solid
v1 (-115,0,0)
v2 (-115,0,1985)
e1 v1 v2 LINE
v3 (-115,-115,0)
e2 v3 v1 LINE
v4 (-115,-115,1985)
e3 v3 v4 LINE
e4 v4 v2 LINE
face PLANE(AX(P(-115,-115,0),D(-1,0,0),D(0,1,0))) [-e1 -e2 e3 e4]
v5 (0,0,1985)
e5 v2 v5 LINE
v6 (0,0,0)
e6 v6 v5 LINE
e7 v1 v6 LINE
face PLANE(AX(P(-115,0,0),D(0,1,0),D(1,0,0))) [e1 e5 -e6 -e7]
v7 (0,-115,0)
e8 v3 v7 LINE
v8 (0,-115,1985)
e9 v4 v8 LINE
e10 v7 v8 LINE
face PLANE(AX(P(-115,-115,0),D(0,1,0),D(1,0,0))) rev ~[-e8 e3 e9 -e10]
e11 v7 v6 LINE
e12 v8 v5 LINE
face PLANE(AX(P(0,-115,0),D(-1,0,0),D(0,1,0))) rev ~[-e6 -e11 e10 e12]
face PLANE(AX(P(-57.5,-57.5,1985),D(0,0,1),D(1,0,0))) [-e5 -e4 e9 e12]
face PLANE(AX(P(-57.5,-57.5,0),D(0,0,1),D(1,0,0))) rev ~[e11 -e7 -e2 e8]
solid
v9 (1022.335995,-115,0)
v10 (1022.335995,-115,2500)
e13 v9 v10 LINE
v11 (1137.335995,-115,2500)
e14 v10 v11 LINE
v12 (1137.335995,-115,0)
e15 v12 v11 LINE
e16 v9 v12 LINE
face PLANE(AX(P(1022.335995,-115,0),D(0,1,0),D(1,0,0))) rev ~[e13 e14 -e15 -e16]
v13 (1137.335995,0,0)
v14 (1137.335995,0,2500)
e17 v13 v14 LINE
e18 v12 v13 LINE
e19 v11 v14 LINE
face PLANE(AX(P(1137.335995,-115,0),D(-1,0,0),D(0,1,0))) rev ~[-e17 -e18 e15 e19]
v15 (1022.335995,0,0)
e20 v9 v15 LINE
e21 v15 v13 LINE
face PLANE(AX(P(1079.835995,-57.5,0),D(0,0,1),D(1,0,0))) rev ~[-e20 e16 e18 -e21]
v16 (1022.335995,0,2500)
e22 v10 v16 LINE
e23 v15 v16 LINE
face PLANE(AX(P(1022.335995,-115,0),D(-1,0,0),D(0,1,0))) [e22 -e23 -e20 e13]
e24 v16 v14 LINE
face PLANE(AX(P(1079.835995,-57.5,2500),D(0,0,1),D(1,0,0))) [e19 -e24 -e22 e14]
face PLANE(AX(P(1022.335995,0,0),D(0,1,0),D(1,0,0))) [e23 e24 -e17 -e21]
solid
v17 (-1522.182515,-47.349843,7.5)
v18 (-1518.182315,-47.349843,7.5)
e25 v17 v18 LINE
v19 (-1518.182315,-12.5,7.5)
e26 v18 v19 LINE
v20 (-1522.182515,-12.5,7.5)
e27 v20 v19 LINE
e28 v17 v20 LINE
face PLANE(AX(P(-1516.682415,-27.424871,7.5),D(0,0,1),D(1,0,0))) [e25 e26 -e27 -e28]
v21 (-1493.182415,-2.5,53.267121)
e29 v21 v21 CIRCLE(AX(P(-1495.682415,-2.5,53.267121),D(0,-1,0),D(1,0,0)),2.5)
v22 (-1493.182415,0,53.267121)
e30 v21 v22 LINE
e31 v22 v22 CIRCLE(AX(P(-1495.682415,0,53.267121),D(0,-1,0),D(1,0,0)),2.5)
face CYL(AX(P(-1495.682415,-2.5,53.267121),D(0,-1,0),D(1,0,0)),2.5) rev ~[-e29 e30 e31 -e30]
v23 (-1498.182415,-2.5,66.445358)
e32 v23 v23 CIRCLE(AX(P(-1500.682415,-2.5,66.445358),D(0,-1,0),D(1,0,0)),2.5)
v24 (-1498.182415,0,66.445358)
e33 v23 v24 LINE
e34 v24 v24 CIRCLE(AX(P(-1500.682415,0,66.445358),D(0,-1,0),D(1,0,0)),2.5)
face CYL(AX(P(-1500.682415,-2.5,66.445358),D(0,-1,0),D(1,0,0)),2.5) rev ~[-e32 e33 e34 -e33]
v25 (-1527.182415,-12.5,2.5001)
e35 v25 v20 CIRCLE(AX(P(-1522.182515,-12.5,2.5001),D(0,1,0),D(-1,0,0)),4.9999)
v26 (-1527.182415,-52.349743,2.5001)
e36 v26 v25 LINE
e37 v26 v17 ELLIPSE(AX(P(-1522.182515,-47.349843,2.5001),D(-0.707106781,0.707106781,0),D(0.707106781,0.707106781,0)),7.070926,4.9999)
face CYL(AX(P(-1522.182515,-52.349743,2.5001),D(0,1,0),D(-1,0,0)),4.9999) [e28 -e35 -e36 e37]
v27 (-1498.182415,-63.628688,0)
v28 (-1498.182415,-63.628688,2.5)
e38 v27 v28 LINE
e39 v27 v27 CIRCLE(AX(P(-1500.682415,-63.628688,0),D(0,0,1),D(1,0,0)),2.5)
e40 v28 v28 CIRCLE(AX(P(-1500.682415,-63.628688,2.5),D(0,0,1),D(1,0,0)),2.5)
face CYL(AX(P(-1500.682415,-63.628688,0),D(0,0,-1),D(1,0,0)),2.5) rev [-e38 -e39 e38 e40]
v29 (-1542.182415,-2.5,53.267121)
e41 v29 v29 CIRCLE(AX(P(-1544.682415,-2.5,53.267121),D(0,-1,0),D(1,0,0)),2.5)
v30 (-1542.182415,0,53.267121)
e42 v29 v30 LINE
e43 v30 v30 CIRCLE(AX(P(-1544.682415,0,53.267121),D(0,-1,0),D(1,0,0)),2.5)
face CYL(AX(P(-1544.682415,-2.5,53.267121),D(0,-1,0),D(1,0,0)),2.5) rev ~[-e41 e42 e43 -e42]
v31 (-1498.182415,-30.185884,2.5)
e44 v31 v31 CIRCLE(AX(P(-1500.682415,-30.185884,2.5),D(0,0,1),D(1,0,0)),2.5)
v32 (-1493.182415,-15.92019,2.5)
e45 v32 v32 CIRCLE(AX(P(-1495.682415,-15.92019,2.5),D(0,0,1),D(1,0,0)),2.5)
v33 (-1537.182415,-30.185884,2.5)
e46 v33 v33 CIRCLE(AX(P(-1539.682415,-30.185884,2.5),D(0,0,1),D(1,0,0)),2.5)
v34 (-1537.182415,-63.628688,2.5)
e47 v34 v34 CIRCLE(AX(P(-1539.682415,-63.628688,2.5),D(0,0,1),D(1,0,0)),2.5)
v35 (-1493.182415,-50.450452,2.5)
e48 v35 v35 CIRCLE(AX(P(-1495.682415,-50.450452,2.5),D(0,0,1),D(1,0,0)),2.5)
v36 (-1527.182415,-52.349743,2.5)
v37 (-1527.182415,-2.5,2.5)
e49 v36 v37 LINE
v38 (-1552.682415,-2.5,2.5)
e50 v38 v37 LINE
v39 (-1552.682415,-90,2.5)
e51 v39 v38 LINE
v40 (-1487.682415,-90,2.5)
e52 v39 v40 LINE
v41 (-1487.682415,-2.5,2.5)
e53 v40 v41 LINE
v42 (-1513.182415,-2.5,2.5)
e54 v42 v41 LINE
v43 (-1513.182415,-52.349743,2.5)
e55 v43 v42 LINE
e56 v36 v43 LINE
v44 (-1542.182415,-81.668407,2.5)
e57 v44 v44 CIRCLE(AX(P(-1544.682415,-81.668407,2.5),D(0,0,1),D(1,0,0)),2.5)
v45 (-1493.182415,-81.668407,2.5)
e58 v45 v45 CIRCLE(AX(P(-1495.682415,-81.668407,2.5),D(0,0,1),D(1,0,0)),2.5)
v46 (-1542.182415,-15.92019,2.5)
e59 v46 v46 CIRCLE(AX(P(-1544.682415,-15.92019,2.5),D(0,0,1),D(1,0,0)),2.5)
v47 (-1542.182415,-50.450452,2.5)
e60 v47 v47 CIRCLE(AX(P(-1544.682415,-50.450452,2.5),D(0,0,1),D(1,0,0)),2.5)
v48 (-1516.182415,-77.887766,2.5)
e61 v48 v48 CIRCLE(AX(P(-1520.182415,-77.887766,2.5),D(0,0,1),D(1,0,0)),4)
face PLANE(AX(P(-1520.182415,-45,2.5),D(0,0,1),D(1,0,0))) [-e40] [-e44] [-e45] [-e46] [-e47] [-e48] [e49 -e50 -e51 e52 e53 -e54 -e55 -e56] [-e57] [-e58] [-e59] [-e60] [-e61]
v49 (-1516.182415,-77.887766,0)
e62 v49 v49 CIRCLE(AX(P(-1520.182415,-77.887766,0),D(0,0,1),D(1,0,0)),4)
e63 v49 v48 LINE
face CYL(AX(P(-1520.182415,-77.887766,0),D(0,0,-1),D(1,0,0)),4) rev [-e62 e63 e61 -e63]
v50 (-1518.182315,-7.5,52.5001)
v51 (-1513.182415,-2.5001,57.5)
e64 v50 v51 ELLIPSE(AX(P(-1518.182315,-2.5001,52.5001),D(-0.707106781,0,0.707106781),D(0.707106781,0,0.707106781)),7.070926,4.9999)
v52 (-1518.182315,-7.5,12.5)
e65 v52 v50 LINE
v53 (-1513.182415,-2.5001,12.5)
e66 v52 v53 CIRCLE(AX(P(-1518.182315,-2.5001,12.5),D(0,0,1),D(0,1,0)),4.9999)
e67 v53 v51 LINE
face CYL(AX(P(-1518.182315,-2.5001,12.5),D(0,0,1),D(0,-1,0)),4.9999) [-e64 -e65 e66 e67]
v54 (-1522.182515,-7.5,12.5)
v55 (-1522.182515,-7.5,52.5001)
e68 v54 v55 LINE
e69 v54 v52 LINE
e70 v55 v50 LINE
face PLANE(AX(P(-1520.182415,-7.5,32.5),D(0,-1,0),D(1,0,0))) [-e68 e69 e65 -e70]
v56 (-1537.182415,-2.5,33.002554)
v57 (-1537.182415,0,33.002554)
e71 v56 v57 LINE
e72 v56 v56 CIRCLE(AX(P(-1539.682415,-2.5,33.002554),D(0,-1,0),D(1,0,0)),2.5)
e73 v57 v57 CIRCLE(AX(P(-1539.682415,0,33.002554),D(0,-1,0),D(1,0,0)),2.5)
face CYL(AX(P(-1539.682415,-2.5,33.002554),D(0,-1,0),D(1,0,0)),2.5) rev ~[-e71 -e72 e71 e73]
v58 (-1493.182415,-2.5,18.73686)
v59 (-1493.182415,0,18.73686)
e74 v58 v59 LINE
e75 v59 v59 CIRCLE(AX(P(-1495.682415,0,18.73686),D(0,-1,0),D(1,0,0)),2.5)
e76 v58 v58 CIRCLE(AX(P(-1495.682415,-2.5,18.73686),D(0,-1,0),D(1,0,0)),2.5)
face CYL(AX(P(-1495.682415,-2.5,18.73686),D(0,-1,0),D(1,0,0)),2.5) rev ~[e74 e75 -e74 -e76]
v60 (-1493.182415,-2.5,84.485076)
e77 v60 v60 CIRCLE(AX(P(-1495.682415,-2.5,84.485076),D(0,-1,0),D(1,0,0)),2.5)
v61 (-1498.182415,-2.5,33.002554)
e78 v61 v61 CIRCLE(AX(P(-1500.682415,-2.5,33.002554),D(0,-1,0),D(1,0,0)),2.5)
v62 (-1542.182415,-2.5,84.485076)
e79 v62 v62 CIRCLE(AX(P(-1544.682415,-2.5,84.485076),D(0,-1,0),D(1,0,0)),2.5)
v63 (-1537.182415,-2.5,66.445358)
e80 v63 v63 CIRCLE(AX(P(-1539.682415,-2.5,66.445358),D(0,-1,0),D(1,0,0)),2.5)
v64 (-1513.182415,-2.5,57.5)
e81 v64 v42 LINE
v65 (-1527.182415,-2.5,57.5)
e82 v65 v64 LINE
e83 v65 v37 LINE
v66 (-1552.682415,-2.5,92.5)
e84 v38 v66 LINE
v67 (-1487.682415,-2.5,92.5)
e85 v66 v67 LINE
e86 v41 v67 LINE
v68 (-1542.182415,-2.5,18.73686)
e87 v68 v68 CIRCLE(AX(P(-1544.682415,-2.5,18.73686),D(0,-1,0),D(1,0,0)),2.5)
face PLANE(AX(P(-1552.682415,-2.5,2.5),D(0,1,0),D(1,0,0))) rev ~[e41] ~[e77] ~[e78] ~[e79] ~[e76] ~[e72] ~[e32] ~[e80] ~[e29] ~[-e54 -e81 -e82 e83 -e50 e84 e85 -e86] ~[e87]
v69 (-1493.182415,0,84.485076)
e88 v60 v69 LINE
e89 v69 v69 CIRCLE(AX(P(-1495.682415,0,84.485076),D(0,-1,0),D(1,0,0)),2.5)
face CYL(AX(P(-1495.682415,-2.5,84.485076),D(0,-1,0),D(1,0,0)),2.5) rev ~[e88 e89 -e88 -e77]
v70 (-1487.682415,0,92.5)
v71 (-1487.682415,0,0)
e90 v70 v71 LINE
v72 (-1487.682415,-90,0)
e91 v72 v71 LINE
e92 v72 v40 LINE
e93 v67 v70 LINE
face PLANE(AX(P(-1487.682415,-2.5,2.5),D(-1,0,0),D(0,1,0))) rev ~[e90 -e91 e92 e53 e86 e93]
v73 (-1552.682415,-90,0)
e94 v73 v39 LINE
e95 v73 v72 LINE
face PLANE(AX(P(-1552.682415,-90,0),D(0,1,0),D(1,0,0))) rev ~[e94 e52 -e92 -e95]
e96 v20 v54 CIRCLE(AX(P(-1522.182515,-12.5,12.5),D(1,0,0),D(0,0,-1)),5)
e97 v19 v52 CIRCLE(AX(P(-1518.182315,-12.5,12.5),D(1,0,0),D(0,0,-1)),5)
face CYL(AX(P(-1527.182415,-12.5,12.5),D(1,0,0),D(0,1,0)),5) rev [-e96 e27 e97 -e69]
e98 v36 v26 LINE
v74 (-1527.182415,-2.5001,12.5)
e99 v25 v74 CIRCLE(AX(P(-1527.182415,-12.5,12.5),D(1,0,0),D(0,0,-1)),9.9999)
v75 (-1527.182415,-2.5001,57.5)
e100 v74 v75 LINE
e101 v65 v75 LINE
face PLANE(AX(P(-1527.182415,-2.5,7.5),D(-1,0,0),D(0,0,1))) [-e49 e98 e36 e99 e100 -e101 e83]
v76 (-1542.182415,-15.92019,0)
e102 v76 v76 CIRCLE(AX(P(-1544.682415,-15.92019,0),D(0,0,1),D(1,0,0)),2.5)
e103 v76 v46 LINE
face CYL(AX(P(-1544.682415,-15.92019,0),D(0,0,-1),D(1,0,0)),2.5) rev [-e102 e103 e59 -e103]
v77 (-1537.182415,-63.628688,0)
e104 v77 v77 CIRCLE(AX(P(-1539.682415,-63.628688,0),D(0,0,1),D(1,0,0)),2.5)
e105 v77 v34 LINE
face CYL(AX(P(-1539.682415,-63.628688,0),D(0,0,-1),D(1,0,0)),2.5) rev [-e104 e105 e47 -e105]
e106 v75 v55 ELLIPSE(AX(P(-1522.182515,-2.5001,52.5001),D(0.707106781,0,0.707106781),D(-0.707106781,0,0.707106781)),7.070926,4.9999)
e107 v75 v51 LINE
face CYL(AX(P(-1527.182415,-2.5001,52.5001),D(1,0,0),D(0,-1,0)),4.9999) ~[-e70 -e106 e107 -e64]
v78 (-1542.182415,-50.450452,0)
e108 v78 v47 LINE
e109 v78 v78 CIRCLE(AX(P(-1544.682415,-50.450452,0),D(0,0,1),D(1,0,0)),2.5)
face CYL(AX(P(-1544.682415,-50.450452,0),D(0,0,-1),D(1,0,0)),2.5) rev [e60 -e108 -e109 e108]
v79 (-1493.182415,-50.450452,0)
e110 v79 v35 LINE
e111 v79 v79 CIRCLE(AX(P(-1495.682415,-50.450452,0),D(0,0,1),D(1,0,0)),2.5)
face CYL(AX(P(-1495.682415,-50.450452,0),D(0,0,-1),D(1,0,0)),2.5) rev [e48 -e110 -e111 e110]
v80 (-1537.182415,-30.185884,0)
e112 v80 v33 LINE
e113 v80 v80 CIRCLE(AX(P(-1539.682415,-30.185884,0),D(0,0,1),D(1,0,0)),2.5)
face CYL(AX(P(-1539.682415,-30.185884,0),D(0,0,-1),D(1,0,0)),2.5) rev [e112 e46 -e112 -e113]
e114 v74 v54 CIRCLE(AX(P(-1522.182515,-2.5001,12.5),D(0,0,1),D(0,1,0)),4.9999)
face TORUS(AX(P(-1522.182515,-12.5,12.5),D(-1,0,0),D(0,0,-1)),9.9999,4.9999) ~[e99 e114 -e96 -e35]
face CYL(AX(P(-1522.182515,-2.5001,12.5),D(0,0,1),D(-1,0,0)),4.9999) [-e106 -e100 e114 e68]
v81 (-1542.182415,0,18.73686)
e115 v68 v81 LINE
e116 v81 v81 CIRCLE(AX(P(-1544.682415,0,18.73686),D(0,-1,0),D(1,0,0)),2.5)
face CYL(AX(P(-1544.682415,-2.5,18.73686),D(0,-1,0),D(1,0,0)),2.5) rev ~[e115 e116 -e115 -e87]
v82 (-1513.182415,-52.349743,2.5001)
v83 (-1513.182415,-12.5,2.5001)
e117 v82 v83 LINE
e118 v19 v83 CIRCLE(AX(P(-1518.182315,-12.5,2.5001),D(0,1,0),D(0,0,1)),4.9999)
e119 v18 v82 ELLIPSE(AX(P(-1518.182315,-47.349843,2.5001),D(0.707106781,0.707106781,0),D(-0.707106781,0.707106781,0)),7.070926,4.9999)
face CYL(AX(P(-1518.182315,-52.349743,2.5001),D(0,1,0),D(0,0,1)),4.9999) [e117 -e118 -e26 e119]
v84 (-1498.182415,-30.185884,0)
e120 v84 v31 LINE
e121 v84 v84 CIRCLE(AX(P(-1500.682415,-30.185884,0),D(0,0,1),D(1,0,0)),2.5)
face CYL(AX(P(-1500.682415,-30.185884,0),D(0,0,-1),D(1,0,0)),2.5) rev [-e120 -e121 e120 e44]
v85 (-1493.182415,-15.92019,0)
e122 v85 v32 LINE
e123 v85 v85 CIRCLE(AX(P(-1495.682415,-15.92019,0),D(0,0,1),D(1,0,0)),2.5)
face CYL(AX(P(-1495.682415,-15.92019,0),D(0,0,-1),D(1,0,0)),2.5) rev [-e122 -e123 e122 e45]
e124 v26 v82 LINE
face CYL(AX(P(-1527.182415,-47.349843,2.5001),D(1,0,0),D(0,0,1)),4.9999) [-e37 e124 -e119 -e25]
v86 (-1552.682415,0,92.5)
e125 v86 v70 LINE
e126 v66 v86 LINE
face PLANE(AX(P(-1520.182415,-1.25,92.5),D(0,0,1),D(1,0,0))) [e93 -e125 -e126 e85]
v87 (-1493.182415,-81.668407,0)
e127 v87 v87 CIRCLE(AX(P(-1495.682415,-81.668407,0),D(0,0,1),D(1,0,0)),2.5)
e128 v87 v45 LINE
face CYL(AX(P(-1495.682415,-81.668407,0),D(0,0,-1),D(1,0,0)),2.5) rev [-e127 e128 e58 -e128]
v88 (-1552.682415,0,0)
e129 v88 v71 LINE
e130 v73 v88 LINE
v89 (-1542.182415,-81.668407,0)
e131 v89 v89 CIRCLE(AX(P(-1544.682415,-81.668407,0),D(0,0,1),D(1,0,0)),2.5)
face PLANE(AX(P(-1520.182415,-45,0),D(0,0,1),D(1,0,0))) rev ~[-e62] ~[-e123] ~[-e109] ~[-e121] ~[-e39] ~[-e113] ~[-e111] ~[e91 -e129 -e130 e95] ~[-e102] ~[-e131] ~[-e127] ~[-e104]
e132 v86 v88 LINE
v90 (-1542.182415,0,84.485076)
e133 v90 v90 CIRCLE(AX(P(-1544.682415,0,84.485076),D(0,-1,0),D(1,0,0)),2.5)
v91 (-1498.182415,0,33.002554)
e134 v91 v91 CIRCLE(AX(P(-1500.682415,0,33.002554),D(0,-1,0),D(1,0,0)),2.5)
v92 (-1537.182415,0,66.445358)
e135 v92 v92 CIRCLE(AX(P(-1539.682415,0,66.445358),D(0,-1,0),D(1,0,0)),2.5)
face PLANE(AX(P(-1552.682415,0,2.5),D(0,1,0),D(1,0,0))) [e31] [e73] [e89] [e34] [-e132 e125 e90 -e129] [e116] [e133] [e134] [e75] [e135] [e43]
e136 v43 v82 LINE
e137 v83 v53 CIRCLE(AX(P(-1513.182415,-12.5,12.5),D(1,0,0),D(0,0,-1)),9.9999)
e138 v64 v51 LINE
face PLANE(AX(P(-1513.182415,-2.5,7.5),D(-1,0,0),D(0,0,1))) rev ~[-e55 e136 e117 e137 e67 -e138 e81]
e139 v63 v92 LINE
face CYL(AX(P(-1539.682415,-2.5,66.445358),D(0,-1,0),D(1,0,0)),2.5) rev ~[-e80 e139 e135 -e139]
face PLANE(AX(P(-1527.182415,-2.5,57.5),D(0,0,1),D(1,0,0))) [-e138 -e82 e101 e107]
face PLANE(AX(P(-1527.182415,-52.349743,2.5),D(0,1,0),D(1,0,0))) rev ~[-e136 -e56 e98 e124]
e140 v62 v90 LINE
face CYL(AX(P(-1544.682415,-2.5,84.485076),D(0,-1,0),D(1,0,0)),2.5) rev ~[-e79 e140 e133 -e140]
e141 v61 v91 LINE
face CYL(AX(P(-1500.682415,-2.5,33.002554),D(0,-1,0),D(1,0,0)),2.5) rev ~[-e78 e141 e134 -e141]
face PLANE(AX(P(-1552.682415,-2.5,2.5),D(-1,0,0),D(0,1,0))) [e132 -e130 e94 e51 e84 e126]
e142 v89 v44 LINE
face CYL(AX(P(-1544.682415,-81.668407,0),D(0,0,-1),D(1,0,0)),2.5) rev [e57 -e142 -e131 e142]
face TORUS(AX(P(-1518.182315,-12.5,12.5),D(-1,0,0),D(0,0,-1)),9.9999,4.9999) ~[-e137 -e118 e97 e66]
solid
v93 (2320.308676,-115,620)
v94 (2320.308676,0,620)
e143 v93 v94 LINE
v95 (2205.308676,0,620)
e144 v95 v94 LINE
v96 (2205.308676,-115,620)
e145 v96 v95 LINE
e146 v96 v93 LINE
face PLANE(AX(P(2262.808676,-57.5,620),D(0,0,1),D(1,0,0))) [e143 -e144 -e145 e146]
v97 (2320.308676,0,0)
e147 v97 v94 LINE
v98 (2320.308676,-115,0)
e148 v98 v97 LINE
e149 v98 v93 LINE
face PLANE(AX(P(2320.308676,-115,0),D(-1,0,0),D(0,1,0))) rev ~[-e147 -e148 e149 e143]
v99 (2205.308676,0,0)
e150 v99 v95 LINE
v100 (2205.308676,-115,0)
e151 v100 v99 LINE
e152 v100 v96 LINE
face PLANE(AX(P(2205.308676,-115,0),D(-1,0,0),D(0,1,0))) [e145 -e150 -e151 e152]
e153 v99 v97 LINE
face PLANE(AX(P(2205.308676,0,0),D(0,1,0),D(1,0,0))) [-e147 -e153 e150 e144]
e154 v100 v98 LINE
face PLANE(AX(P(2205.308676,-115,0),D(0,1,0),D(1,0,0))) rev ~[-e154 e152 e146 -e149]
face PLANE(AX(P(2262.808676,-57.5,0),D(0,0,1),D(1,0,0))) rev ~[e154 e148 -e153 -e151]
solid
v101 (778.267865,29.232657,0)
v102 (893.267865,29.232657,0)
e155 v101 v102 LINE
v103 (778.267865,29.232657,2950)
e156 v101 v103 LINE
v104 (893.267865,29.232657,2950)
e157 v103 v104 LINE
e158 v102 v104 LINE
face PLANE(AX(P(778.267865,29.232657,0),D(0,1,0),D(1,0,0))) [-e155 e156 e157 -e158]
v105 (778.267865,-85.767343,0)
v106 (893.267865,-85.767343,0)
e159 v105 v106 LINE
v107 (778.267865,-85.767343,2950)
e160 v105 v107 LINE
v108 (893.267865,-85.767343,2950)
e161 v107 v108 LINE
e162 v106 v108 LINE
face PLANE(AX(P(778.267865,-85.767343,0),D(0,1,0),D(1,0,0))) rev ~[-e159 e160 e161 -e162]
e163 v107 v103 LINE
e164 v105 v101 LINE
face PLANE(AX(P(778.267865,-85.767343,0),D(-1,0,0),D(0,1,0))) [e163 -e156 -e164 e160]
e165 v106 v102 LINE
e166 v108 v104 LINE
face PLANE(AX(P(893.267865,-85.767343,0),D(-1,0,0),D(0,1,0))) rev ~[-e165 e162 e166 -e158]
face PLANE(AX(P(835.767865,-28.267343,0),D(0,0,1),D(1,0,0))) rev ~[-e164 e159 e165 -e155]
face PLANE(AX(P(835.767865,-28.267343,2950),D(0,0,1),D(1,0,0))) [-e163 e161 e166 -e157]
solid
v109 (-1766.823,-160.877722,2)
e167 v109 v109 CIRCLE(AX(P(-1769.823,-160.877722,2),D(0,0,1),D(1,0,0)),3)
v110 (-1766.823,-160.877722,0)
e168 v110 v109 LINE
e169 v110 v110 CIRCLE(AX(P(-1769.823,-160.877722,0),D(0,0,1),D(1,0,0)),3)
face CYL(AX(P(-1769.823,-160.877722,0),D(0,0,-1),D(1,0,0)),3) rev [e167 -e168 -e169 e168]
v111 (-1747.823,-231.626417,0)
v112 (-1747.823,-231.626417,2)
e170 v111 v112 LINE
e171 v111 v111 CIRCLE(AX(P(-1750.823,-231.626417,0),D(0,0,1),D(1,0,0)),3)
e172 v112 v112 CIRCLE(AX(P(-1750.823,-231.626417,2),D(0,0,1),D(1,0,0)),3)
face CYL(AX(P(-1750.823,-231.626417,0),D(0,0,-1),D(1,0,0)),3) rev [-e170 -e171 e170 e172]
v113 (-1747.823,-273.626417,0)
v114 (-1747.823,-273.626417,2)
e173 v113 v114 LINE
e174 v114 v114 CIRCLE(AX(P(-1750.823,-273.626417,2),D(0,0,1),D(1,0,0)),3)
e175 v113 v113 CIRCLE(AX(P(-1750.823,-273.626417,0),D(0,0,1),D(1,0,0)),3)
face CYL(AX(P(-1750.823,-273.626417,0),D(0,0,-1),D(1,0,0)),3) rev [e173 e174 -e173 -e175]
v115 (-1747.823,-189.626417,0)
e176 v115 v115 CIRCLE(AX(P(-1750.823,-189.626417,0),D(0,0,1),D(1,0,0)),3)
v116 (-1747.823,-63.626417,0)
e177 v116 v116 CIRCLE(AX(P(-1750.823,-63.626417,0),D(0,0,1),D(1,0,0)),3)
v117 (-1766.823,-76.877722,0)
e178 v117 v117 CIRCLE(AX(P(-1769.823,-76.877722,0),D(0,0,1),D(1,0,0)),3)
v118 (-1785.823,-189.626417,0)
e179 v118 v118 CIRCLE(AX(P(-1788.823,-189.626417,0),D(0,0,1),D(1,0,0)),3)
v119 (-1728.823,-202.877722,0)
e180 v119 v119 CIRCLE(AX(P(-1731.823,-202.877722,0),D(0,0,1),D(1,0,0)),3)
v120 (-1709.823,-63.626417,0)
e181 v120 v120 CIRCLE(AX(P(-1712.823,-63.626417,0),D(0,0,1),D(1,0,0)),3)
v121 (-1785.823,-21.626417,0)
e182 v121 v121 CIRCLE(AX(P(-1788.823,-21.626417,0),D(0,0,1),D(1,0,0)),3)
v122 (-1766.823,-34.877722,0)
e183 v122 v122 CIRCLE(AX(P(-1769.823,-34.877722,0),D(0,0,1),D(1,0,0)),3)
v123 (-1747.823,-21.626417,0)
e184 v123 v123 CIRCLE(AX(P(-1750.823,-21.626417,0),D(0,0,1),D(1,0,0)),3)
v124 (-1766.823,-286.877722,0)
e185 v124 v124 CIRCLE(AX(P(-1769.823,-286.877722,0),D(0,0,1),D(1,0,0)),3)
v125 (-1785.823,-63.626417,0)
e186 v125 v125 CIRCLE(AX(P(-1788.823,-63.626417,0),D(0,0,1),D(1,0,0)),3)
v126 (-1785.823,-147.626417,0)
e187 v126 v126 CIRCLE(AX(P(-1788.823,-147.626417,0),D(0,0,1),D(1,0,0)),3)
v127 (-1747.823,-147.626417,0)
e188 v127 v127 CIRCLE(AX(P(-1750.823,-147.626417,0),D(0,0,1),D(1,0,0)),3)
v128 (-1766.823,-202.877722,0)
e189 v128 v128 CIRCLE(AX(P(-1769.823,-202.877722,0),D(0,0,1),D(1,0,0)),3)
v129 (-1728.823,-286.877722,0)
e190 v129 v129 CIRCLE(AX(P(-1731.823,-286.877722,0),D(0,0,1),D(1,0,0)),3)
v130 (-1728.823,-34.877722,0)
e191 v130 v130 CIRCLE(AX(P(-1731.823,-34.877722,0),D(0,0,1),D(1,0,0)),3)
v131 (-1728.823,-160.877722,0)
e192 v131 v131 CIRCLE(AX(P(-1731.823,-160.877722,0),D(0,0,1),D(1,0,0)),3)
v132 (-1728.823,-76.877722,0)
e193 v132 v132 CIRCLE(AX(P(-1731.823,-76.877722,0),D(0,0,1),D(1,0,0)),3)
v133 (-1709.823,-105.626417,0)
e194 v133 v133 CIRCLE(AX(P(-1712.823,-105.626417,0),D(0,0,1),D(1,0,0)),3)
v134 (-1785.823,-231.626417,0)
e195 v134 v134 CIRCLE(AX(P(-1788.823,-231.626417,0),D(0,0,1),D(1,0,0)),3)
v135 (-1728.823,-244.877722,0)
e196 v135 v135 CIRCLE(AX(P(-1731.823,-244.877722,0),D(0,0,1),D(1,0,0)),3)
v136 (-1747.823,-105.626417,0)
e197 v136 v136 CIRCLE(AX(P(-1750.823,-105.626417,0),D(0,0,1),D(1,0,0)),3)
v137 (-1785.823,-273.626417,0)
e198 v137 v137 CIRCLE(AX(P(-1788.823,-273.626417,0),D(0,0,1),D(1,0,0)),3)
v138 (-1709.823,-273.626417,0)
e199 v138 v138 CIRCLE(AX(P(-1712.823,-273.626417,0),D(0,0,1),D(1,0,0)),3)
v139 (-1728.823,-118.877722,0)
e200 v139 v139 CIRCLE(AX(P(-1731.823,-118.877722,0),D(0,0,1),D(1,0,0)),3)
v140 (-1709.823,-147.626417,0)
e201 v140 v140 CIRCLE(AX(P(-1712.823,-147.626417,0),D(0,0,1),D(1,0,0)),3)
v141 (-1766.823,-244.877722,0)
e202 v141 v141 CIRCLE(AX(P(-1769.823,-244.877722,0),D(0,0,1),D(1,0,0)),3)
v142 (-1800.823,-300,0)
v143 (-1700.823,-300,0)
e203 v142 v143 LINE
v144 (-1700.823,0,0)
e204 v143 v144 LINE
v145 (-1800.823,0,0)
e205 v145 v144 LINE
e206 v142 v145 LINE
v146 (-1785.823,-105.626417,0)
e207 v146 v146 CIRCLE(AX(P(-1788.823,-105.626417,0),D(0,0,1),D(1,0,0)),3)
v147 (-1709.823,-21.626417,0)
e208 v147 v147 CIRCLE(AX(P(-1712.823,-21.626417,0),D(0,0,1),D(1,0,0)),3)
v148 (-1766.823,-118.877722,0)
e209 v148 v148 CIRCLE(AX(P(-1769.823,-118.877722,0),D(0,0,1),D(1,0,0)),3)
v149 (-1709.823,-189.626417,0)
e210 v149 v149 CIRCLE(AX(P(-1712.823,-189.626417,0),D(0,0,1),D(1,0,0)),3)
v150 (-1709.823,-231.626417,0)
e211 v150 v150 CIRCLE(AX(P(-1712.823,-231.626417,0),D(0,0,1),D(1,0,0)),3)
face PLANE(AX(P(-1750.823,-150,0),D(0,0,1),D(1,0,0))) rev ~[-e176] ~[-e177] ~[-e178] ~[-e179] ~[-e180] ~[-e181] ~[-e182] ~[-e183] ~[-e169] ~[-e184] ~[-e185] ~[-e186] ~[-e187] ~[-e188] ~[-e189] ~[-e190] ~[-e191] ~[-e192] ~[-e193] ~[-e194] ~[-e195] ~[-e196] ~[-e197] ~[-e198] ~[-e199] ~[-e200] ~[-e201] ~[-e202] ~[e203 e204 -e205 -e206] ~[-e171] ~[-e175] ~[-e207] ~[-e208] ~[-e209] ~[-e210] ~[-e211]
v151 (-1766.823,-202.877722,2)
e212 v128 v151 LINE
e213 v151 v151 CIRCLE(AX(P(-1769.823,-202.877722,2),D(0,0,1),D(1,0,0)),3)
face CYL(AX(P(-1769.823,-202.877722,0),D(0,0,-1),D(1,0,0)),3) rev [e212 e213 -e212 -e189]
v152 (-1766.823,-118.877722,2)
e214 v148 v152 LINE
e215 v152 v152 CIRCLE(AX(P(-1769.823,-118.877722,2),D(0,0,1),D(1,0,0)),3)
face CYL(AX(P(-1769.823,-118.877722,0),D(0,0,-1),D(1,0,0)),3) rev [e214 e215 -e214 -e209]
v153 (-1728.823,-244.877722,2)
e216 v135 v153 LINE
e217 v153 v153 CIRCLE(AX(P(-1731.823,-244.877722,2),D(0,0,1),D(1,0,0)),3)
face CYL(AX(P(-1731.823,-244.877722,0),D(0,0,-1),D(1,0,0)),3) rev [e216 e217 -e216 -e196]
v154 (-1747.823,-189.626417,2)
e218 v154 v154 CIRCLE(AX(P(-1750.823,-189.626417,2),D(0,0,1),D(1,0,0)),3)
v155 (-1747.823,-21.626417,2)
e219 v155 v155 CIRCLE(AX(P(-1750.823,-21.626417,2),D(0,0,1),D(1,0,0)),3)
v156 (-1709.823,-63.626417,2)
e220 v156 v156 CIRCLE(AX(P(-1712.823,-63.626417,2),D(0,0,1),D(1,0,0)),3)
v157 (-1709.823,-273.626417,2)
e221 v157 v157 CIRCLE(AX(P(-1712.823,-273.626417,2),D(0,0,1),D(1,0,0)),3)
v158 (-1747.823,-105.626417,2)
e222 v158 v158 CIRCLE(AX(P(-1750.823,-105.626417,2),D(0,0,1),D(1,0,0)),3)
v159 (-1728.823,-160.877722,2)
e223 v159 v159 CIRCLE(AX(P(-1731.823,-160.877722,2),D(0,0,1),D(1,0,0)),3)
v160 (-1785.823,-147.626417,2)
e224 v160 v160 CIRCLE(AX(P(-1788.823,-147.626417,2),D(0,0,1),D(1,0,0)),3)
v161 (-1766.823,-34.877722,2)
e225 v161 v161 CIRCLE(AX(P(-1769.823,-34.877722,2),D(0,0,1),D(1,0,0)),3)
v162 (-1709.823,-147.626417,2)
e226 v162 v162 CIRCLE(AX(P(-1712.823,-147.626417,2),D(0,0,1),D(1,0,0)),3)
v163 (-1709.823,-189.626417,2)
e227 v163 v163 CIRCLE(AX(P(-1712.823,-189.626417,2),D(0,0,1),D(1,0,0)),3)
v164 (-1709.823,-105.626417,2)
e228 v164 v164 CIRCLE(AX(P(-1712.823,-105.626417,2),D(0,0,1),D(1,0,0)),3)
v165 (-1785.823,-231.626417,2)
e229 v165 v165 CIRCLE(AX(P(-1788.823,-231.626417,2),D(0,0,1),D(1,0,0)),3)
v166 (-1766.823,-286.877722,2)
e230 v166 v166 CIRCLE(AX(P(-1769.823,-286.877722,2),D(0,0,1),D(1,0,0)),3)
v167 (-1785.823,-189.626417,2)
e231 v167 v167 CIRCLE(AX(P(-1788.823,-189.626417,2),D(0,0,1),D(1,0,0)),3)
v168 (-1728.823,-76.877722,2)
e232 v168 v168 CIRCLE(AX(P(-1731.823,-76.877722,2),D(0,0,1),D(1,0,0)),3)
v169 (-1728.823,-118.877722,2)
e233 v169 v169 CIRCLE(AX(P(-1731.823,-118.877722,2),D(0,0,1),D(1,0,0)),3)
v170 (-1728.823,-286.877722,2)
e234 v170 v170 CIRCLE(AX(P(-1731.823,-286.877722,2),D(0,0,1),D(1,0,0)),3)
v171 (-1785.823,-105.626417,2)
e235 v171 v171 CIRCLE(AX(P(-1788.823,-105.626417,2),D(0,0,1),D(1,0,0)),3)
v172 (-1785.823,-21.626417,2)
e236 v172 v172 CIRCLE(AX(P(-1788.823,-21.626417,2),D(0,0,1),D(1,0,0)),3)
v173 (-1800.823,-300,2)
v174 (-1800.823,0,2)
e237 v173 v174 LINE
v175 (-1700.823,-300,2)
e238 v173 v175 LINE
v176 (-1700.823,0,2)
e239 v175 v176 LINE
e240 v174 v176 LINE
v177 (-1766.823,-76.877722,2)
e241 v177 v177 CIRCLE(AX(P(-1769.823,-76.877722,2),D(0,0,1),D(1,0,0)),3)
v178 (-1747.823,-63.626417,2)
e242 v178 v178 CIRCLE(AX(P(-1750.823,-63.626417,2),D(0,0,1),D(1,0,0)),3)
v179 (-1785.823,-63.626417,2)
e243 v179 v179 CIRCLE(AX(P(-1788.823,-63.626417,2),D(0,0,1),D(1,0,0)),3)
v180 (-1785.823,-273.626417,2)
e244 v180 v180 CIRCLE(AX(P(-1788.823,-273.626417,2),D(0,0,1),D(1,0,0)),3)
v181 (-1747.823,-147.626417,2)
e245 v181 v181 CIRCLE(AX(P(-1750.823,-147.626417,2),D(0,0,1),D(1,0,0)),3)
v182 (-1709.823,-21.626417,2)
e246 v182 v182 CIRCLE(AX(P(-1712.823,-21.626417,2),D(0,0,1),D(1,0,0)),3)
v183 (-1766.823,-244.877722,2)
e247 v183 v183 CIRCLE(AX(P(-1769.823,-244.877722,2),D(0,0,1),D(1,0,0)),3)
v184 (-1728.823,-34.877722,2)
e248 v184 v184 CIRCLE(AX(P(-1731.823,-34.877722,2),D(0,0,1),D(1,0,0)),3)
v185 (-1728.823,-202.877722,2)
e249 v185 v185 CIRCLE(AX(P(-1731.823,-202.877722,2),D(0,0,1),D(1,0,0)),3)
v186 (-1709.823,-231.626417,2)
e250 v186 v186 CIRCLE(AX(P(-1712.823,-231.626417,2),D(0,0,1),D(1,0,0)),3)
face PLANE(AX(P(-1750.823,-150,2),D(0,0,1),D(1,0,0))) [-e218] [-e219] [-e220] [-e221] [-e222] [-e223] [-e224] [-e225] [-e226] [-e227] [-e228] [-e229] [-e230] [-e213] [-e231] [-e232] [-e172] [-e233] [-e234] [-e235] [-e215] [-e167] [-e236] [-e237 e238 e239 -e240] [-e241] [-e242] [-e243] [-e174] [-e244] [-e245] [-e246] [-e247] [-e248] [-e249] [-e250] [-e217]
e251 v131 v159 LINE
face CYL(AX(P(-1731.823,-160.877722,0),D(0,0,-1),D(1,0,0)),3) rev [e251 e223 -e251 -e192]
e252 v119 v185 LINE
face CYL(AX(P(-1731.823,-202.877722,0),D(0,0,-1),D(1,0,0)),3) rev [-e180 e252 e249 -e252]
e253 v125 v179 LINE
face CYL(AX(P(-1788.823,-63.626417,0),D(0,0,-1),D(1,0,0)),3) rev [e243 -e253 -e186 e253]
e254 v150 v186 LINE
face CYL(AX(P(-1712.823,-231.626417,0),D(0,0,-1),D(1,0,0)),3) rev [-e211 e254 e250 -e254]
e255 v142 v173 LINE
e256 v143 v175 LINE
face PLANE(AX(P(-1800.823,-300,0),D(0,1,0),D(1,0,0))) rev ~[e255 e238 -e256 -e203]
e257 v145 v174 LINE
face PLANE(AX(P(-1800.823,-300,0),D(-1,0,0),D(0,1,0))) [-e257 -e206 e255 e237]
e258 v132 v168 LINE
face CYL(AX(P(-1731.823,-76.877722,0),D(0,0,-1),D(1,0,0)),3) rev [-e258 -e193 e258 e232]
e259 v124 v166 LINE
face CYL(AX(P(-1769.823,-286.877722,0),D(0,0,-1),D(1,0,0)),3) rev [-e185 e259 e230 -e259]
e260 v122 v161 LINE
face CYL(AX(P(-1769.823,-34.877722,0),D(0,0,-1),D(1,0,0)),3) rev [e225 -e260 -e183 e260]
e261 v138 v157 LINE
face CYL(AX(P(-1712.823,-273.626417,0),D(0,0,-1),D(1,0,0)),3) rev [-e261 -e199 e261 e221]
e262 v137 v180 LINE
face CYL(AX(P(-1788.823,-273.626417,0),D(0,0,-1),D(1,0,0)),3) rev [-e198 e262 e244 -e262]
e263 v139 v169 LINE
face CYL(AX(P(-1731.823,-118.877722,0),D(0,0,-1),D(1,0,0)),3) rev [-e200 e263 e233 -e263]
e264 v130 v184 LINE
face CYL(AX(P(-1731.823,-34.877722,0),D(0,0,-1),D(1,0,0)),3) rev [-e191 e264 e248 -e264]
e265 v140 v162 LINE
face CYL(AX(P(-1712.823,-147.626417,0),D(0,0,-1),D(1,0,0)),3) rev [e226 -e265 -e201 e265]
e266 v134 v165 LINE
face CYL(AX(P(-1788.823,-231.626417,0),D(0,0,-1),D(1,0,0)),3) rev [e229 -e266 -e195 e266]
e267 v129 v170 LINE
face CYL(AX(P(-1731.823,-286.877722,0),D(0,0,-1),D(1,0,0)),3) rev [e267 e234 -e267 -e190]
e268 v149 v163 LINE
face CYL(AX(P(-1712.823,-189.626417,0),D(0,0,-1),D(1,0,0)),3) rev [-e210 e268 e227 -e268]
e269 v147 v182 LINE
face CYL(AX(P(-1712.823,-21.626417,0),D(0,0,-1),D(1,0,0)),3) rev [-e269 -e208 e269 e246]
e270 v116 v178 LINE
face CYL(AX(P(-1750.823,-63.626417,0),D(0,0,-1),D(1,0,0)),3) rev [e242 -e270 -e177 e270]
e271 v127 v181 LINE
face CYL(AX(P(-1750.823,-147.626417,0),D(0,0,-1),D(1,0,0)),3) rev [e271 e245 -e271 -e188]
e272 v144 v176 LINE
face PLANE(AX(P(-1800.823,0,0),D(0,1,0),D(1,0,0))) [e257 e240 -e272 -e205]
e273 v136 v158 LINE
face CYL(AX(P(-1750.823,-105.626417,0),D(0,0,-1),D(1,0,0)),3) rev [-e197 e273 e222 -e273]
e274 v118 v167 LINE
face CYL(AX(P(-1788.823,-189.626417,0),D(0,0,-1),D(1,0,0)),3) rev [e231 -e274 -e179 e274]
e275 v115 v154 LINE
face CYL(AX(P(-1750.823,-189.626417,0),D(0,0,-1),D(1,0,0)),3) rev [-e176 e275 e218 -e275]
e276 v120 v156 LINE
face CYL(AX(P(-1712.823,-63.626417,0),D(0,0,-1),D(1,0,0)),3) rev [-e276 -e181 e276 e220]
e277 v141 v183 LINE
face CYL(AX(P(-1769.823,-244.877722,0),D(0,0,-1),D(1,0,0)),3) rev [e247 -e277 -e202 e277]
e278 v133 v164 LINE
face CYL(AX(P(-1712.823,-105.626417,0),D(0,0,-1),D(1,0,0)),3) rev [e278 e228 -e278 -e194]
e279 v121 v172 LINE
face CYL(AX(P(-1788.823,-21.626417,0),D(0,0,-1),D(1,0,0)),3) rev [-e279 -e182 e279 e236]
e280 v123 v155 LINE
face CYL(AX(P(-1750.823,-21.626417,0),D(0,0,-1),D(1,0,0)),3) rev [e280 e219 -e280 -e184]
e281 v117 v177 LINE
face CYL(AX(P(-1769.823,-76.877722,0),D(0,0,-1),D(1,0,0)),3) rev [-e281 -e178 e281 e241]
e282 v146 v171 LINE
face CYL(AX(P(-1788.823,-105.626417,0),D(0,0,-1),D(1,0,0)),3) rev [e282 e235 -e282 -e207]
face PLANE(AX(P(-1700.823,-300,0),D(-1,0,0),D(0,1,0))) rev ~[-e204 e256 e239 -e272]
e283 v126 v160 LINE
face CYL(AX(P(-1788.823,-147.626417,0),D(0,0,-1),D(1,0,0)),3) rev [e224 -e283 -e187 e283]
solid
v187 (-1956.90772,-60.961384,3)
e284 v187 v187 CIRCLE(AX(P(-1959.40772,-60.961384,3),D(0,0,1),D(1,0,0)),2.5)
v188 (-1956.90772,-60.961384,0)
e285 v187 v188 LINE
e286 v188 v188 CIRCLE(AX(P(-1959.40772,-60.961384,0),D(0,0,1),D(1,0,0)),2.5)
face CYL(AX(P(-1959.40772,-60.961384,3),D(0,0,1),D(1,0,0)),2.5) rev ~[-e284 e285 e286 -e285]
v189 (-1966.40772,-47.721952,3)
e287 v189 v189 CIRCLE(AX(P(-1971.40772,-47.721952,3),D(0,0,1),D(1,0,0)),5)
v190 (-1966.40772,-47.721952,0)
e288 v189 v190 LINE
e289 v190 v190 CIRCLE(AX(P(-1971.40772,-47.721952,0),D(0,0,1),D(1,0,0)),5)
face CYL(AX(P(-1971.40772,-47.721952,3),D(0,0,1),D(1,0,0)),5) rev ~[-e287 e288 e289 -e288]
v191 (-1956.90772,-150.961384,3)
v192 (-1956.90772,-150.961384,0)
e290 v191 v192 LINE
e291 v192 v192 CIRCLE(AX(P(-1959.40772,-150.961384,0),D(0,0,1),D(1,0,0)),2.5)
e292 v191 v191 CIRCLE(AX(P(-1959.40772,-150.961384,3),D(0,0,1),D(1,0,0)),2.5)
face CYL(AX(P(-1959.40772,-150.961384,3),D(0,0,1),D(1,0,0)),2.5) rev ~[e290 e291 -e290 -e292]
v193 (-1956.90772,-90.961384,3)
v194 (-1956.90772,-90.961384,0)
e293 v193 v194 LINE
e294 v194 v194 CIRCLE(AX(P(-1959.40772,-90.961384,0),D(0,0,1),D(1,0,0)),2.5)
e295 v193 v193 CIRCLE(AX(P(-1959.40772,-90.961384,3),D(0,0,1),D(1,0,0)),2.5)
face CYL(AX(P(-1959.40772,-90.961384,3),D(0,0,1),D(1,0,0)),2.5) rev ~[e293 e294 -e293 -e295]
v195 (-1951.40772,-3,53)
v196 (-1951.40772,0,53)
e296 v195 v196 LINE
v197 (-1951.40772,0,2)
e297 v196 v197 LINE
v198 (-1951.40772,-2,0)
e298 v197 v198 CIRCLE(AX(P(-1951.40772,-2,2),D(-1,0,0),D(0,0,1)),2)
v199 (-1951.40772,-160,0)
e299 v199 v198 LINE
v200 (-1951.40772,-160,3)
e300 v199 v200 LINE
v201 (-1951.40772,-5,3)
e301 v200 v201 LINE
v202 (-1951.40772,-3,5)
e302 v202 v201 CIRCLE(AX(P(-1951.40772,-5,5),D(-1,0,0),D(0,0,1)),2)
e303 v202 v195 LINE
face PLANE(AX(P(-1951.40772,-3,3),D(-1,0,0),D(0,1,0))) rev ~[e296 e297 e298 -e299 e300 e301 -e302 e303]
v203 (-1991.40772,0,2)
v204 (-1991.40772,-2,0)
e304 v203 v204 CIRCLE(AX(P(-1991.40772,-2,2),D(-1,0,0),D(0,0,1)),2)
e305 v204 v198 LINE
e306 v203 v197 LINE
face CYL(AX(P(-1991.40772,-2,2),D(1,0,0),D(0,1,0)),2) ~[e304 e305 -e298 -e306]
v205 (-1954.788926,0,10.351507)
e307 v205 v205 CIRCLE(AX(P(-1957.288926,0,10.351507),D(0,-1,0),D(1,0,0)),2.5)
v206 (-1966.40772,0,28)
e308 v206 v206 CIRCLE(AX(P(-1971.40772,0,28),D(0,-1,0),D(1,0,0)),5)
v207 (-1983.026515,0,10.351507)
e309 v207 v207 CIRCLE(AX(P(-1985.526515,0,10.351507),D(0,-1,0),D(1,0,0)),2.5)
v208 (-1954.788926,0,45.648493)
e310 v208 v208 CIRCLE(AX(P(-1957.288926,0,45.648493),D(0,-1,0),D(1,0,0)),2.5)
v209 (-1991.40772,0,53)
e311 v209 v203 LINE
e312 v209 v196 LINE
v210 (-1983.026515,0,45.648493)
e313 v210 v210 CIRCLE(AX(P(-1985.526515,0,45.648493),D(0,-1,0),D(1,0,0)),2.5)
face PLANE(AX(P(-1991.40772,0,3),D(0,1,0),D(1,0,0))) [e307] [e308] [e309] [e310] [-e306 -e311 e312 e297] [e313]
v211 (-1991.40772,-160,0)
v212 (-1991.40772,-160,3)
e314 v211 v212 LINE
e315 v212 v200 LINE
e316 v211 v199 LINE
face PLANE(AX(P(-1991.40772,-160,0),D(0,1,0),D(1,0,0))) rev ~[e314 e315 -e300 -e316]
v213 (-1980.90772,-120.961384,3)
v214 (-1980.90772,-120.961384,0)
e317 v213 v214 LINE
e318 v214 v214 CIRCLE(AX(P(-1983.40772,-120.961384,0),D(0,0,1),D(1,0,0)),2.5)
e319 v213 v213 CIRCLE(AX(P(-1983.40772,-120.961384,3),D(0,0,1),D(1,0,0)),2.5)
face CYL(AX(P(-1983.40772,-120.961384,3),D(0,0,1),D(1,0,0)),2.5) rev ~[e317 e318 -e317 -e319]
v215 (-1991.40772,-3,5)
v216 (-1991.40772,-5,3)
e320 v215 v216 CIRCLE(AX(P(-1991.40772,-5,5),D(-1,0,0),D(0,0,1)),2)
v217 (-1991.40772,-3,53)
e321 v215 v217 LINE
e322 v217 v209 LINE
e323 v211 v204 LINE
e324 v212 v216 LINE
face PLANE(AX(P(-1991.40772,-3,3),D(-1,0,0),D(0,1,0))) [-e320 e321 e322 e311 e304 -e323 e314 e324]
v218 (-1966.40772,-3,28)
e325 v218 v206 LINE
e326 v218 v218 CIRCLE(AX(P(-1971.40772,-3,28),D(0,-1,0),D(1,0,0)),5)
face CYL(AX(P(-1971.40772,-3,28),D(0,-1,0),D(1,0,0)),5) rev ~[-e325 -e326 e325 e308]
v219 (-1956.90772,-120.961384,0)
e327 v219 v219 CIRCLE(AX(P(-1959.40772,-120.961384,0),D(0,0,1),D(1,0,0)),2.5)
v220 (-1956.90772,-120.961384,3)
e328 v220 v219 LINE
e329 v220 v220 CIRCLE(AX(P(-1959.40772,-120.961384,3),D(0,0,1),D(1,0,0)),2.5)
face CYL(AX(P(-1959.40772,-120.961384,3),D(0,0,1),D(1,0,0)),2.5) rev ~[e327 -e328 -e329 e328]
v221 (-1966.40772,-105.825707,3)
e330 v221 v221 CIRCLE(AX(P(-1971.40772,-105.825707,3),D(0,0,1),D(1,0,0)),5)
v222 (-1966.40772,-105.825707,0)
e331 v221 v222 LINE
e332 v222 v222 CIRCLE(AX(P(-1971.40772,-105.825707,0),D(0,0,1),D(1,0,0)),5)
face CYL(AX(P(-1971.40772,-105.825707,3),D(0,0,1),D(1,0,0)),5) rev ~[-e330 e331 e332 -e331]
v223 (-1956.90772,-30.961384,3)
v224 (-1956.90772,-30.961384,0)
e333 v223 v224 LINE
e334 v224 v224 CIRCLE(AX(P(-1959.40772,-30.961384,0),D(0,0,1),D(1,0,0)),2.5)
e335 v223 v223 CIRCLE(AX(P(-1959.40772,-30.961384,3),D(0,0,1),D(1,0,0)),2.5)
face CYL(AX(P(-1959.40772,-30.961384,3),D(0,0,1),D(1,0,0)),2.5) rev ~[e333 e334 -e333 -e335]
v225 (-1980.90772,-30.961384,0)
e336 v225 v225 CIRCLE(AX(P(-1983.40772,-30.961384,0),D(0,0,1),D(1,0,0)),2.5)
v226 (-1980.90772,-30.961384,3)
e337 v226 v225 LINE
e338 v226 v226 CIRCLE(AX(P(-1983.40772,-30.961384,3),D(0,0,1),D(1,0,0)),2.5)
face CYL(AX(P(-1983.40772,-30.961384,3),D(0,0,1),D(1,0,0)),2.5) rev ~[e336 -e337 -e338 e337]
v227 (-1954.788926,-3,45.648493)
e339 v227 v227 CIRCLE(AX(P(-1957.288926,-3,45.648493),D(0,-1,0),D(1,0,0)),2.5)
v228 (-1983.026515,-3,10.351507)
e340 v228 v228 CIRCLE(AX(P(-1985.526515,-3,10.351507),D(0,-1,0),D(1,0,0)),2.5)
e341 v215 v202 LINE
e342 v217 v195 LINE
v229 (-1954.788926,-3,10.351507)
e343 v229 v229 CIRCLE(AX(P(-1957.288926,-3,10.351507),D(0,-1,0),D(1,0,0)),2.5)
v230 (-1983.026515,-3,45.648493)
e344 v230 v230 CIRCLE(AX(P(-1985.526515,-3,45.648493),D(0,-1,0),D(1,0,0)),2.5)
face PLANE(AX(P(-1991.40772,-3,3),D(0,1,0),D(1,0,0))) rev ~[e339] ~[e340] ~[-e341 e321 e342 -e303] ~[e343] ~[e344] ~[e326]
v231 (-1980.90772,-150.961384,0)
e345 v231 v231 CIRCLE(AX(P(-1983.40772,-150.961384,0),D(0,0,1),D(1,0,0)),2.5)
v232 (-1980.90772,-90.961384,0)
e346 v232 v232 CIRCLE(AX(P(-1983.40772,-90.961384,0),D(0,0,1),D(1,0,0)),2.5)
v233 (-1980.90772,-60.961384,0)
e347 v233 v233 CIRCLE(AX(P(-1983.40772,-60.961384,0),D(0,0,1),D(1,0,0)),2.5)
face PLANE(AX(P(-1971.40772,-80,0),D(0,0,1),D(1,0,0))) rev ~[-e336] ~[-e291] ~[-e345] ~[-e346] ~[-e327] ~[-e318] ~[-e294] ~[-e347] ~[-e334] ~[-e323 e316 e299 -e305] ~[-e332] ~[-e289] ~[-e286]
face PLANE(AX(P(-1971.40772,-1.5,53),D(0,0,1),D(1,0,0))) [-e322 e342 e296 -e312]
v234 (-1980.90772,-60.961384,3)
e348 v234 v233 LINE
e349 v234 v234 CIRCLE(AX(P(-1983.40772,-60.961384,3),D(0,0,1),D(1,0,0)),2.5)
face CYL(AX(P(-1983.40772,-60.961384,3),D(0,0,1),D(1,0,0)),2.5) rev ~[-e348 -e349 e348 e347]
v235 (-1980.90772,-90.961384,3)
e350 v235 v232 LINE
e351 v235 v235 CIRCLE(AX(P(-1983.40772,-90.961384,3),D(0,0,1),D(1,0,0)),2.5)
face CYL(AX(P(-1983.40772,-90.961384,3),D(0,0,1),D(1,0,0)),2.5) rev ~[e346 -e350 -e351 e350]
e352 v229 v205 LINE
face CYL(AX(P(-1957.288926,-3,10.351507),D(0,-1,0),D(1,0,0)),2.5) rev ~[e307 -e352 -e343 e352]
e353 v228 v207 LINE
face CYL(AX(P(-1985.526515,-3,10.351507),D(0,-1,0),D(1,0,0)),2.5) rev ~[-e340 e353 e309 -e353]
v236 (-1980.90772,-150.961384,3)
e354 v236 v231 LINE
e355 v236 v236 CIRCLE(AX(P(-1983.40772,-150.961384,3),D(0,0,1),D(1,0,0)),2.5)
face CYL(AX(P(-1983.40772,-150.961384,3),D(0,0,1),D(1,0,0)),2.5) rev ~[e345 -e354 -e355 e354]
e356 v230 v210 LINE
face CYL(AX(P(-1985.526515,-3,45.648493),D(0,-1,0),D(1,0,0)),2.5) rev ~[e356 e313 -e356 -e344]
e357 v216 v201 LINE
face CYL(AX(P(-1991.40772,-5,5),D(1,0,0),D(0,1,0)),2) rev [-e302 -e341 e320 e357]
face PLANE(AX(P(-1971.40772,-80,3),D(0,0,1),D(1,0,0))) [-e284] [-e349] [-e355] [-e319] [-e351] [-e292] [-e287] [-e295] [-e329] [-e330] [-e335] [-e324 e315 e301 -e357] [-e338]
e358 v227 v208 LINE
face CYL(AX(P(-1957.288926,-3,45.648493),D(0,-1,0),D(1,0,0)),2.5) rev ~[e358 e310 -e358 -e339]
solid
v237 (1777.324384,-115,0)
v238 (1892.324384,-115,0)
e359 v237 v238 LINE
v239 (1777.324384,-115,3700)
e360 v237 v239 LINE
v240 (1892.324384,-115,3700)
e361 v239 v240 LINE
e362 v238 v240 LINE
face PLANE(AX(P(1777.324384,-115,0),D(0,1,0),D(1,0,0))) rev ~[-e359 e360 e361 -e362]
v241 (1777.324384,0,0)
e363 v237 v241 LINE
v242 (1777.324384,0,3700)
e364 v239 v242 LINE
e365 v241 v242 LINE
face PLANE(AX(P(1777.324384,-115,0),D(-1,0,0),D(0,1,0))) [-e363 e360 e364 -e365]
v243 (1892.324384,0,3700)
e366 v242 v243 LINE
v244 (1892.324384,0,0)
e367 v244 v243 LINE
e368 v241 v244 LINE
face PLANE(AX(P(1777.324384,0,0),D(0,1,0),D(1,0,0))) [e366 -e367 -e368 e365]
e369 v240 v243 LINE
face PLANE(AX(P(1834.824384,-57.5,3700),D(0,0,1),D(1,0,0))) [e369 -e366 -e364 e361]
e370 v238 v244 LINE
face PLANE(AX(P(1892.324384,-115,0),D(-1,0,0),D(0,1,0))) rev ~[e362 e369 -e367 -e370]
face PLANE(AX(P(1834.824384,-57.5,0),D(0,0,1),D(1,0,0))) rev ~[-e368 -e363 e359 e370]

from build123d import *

# Parameters (mm, degrees)
F0_W      = 115
F0_H      = 115
F1_DEPTH  = 1985
F2_W      = 115
F2_H      = 115
F3_DEPTH  = 2950
F4_W      = 115
F4_H      = 115
F5_DEPTH  = 2500
F6_W      = 115
F6_H      = 115
F7_DEPTH  = 3700
F8_W      = 115
F8_H      = 115
F9_DEPTH  = 620
F10_W     = 65
F10_H     = 90
F10_R     = 2.5
F10_R_2   = 4
F11_DEPTH = 2.5
F12_W     = 65
F12_H     = 2.5
F13_DEPTH = 90
F14_W     = 7
F14_H     = 49.849742502
F15_DEPTH = 5
F16_W     = 14
F16_H     = 50
F17_DEPTH = 5
F18_F1_R  = 5
F18_F2_R  = 4.9999
F16_R     = 2.5
F19_DEPTH = 25
F20_W     = 100
F20_H     = 300
F20_R     = 3
F21_DEPTH = 2
F22_W     = 40
F22_H     = 160
F23_DEPTH = 3
F24_W     = 40
F24_H     = 3
F25_DEPTH = 50
F26_R     = 5
F26_R_2   = 2.5
F27_DEPTH = 25
F28_R     = 2
F29_R     = 2.5
F29_R_2   = 5
F30_DEPTH = 25


# Not quite as in the source:
# - a fillet or chamfer is up to 0.001 mm smaller than in the source, because OpenCascade refuses the exact size


with BuildPart() as f1:
    # F0 (on Top) → F1 (new body)
    with BuildSketch(Plane.XY):
        with Locations((-57.5, -57.5)):
            Rectangle(F0_W, F0_H)
    extrude(amount=F1_DEPTH)


with BuildPart() as f3:
    # F2 (on Top) → F3 (new body)
    with BuildSketch(Plane.XY):
        with Locations((835.767865181, -28.2673428646)):
            Rectangle(F2_W, F2_H)
    extrude(amount=F3_DEPTH)


with BuildPart() as f5:
    # F4 (on Top) → F5 (new body)
    with BuildSketch(Plane.XY):
        with Locations((1079.8359951153, -57.5)):
            Rectangle(F4_W, F4_H)
    extrude(amount=F5_DEPTH)


with BuildPart() as f7:
    # F6 (on Top) → F7 (new body)
    with BuildSketch(Plane.XY):
        with Locations((1834.8243838341, -57.5)):
            Rectangle(F6_W, F6_H)
    extrude(amount=F7_DEPTH)


with BuildPart() as f9:
    # F8 (on Top) → F9 (new body)
    with BuildSketch(Plane.XY):
        with Locations((2262.808675766, -57.5)):
            Rectangle(F8_W, F8_H)
    extrude(amount=F9_DEPTH)


with BuildPart() as f11:
    # F10 (on Top) → F11 (new body)
    with BuildSketch(Plane.XY):
        with Locations((-1520.1824146039, -45)):
            Rectangle(F10_W, F10_H)
        with Locations((-1544.6824146039, -81.6684067249)):
            Circle(F10_R, mode=Mode.SUBTRACT)
        with Locations((-1539.6824146039, -63.6286884546)):
            Circle(F10_R, mode=Mode.SUBTRACT)
        with Locations((-1544.6824146039, -50.4504516721)):
            Circle(F10_R, mode=Mode.SUBTRACT)
        with Locations((-1520.1824146039, -77.8877660632)):
            Circle(F10_R_2, mode=Mode.SUBTRACT)
        with Locations((-1495.6824146039, -81.6684067249)):
            Circle(F10_R, mode=Mode.SUBTRACT)
        with Locations((-1500.6824146039, -63.6286884546)):
            Circle(F10_R, mode=Mode.SUBTRACT)
        with Locations((-1495.6824146039, -50.4504516721)):
            Circle(F10_R, mode=Mode.SUBTRACT)
        with Locations((-1539.6824146039, -30.1858838648)):
            Circle(F10_R, mode=Mode.SUBTRACT)
        with Locations((-1544.6824146039, -15.9201901406)):
            Circle(F10_R, mode=Mode.SUBTRACT)
        with Locations((-1500.6824146039, -30.1858838648)):
            Circle(F10_R, mode=Mode.SUBTRACT)
        with Locations((-1495.6824146039, -15.9201901406)):
            Circle(F10_R, mode=Mode.SUBTRACT)
    extrude(amount=F11_DEPTH)

    # F12 (on face) → F13 (join)
    with BuildSketch(Plane.XY.offset(2.5)):
        with Locations((-1520.1824146039, -1.25)):
            Rectangle(F12_W, F12_H)
    extrude(amount=F13_DEPTH)

    # F14 (on face) → F15 (join)
    with BuildSketch(Plane.XY.offset(2.5)):
        with Locations((-1516.6824146039, -27.424871251)):
            Rectangle(F14_W, F14_H)
        with Locations((-1523.6824146039, -27.424871251)):
            Rectangle(F14_W, F14_H)
    extrude(amount=F15_DEPTH)

    # F16 (on face) → F17 (join)
    with BuildSketch(Plane.XZ.offset(2.5)):
        with Locations((-1520.1824146039, 32.5)):
            Rectangle(F16_W, F16_H)
    extrude(amount=F17_DEPTH)

    # F18: fillet of radius 5 on 5 edges, made by hand

    # F18_f1
    f18_f1_edges = [f11.edges().sort_by_distance(p)[0] for p in [
        (-1520.1824146039, -7.5, 7.5),
    ]]
    fillet(f18_f1_edges, radius=F18_F1_R)

    # F18_f2 (radius 5 in the source; OpenCascade refuses exactly that, so slightly less here)
    f18_f2_edges = [f11.edges().sort_by_distance(p)[0] for p in [
        (-1527.1824146039, -32.424871251, 7.5),
        (-1513.1824146039, -7.5, 35),
        (-1520.1824146039, -52.349742502, 7.5),
        (-1520.1824146039, -7.5, 57.5),
        (-1513.1824146039, -8.9644660941, 8.9644660941),
        (-1527.1824146039, -8.9644660941, 8.9644660941),
    ]]
    fillet(f18_f2_edges, radius=F18_F2_R)

    # F16 (on face) → F19 (cut)
    with BuildSketch(Plane.XZ.offset(2.5)):
        with Locations((-1544.6824146039, 18.7368597835)):
            Circle(F16_R)
        with Locations((-1539.6824146039, 33.0025535077)):
            Circle(F16_R)
        with Locations((-1544.6824146039, 53.267121315)):
            Circle(F16_R)
        with Locations((-1539.6824146039, 66.4453580976)):
            Circle(F16_R)
        with Locations((-1544.6824146039, 84.4850763679)):
            Circle(F16_R)
        with Locations((-1495.6824146039, 84.4850763679)):
            Circle(F16_R)
        with Locations((-1500.6824146039, 66.4453580976)):
            Circle(F16_R)
        with Locations((-1495.6824146039, 53.267121315)):
            Circle(F16_R)
        with Locations((-1500.6824146039, 33.0025535077)):
            Circle(F16_R)
        with Locations((-1495.6824146039, 18.7368597835)):
            Circle(F16_R)
    extrude(amount=-F19_DEPTH, mode=Mode.SUBTRACT)


with BuildPart() as f21:
    # F20 (on Top) → F21 (new body)
    with BuildSketch(Plane.XY):
        with Locations((-1750.8230004184, -150)):
            Rectangle(F20_W, F20_H)
        with Locations((-1788.8230004184, -273.6264169216)):
            Circle(F20_R, mode=Mode.SUBTRACT)
        with Locations((-1788.8230004184, -231.6264169216)):
            Circle(F20_R, mode=Mode.SUBTRACT)
        with Locations((-1769.8230004184, -286.8777215481)):
            Circle(F20_R, mode=Mode.SUBTRACT)
        with Locations((-1750.8230004184, -273.6264169216)):
            Circle(F20_R, mode=Mode.SUBTRACT)
        with Locations((-1769.8230004184, -244.8777215481)):
            Circle(F20_R, mode=Mode.SUBTRACT)
        with Locations((-1750.8230004184, -231.6264169216)):
            Circle(F20_R, mode=Mode.SUBTRACT)
        with Locations((-1788.8230004184, -189.6264169216)):
            Circle(F20_R, mode=Mode.SUBTRACT)
        with Locations((-1769.8230004184, -202.8777215481)):
            Circle(F20_R, mode=Mode.SUBTRACT)
        with Locations((-1750.8230004184, -189.6264169216)):
            Circle(F20_R, mode=Mode.SUBTRACT)
        with Locations((-1769.8230004184, -160.8777215481)):
            Circle(F20_R, mode=Mode.SUBTRACT)
        with Locations((-1731.8230004184, -286.8777215481)):
            Circle(F20_R, mode=Mode.SUBTRACT)
        with Locations((-1731.8230004184, -244.8777215481)):
            Circle(F20_R, mode=Mode.SUBTRACT)
        with Locations((-1712.8230004184, -273.6264169216)):
            Circle(F20_R, mode=Mode.SUBTRACT)
        with Locations((-1712.8230004184, -231.6264169216)):
            Circle(F20_R, mode=Mode.SUBTRACT)
        with Locations((-1731.8230004184, -202.8777215481)):
            Circle(F20_R, mode=Mode.SUBTRACT)
        with Locations((-1731.8230004184, -160.8777215481)):
            Circle(F20_R, mode=Mode.SUBTRACT)
        with Locations((-1712.8230004184, -189.6264169216)):
            Circle(F20_R, mode=Mode.SUBTRACT)
        with Locations((-1788.8230004184, -147.6264169216)):
            Circle(F20_R, mode=Mode.SUBTRACT)
        with Locations((-1788.8230004184, -105.6264169216)):
            Circle(F20_R, mode=Mode.SUBTRACT)
        with Locations((-1769.8230004184, -118.8777215481)):
            Circle(F20_R, mode=Mode.SUBTRACT)
        with Locations((-1750.8230004184, -147.6264169216)):
            Circle(F20_R, mode=Mode.SUBTRACT)
        with Locations((-1769.8230004184, -76.8777215481)):
            Circle(F20_R, mode=Mode.SUBTRACT)
        with Locations((-1750.8230004184, -105.6264169216)):
            Circle(F20_R, mode=Mode.SUBTRACT)
        with Locations((-1788.8230004184, -63.6264169216)):
            Circle(F20_R, mode=Mode.SUBTRACT)
        with Locations((-1788.8230004184, -21.6264169216)):
            Circle(F20_R, mode=Mode.SUBTRACT)
        with Locations((-1750.8230004184, -63.6264169216)):
            Circle(F20_R, mode=Mode.SUBTRACT)
        with Locations((-1769.8230004184, -34.8777215481)):
            Circle(F20_R, mode=Mode.SUBTRACT)
        with Locations((-1750.8230004184, -21.6264169216)):
            Circle(F20_R, mode=Mode.SUBTRACT)
        with Locations((-1731.8230004184, -118.8777215481)):
            Circle(F20_R, mode=Mode.SUBTRACT)
        with Locations((-1731.8230004184, -76.8777215481)):
            Circle(F20_R, mode=Mode.SUBTRACT)
        with Locations((-1712.8230004184, -147.6264169216)):
            Circle(F20_R, mode=Mode.SUBTRACT)
        with Locations((-1712.8230004184, -105.6264169216)):
            Circle(F20_R, mode=Mode.SUBTRACT)
        with Locations((-1731.8230004184, -34.8777215481)):
            Circle(F20_R, mode=Mode.SUBTRACT)
        with Locations((-1712.8230004184, -63.6264169216)):
            Circle(F20_R, mode=Mode.SUBTRACT)
        with Locations((-1712.8230004184, -21.6264169216)):
            Circle(F20_R, mode=Mode.SUBTRACT)
    extrude(amount=F21_DEPTH)


with BuildPart() as f23:
    # F22 (on Top) → F23 (new body)
    with BuildSketch(Plane.XY):
        with Locations((-1971.4077202505, -80)):
            Rectangle(F22_W, F22_H)
    extrude(amount=F23_DEPTH)

    # F24 (on face) → F25 (join)
    with BuildSketch(Plane.XY.offset(3)):
        with Locations((-1971.4077202505, -1.5)):
            Rectangle(F24_W, F24_H)
    extrude(amount=F25_DEPTH)

    # F26 (on face) → F27 (cut)
    with BuildSketch(Plane.XZ.offset(3)):
        with Locations((-1971.4077202505, 28)):
            Circle(F26_R)
        with Locations((-1985.5265147915, 10.3515068237)):
            Circle(F26_R_2)
        with Locations((-1985.5265147915, 45.6484931763)):
            Circle(F26_R_2)
        with Locations((-1957.2889257095, 45.6484931763)):
            Circle(F26_R_2)
        with Locations((-1957.2889257095, 10.3515068237)):
            Circle(F26_R_2)
    extrude(amount=-F27_DEPTH, mode=Mode.SUBTRACT)

    # F28
    f28_edges = [f23.edges().sort_by_distance(p)[0] for p in [
        (-1971.40772, -3, 3),
        (-1971.40772, 0, 0),
    ]]
    fillet(f28_edges, radius=F28_R)

    # F29 (on face) → F30 (cut)
    with BuildSketch(Plane.XY.offset(3)):
        with Locations((-1959.4077202505, -30.9613841772)):
            Circle(F29_R)
        with Locations((-1959.4077202505, -60.9613841772)):
            Circle(F29_R)
        with Locations((-1959.4077202505, -90.9613841772)):
            Circle(F29_R)
        with Locations((-1959.4077202505, -120.9613841772)):
            Circle(F29_R)
        with Locations((-1959.4077202505, -150.9613841772)):
            Circle(F29_R)
        with Locations((-1983.4077202505, -150.9613841772)):
            Circle(F29_R)
        with Locations((-1983.4077202505, -120.9613841772)):
            Circle(F29_R)
        with Locations((-1983.4077202505, -90.9613841772)):
            Circle(F29_R)
        with Locations((-1983.4077202505, -60.9613841772)):
            Circle(F29_R)
        with Locations((-1983.4077202505, -30.9613841772)):
            Circle(F29_R)
        with Locations((-1971.4077202505, -47.7219521999)):
            Circle(F29_R_2)
        with Locations((-1971.4077202505, -105.8257073164)):
            Circle(F29_R_2)
    extrude(amount=-F30_DEPTH, mode=Mode.SUBTRACT)


solid = Compound([f1.part, f3.part, f5.part, f7.part, f9.part, f11.part, f21.part, f23.part])
